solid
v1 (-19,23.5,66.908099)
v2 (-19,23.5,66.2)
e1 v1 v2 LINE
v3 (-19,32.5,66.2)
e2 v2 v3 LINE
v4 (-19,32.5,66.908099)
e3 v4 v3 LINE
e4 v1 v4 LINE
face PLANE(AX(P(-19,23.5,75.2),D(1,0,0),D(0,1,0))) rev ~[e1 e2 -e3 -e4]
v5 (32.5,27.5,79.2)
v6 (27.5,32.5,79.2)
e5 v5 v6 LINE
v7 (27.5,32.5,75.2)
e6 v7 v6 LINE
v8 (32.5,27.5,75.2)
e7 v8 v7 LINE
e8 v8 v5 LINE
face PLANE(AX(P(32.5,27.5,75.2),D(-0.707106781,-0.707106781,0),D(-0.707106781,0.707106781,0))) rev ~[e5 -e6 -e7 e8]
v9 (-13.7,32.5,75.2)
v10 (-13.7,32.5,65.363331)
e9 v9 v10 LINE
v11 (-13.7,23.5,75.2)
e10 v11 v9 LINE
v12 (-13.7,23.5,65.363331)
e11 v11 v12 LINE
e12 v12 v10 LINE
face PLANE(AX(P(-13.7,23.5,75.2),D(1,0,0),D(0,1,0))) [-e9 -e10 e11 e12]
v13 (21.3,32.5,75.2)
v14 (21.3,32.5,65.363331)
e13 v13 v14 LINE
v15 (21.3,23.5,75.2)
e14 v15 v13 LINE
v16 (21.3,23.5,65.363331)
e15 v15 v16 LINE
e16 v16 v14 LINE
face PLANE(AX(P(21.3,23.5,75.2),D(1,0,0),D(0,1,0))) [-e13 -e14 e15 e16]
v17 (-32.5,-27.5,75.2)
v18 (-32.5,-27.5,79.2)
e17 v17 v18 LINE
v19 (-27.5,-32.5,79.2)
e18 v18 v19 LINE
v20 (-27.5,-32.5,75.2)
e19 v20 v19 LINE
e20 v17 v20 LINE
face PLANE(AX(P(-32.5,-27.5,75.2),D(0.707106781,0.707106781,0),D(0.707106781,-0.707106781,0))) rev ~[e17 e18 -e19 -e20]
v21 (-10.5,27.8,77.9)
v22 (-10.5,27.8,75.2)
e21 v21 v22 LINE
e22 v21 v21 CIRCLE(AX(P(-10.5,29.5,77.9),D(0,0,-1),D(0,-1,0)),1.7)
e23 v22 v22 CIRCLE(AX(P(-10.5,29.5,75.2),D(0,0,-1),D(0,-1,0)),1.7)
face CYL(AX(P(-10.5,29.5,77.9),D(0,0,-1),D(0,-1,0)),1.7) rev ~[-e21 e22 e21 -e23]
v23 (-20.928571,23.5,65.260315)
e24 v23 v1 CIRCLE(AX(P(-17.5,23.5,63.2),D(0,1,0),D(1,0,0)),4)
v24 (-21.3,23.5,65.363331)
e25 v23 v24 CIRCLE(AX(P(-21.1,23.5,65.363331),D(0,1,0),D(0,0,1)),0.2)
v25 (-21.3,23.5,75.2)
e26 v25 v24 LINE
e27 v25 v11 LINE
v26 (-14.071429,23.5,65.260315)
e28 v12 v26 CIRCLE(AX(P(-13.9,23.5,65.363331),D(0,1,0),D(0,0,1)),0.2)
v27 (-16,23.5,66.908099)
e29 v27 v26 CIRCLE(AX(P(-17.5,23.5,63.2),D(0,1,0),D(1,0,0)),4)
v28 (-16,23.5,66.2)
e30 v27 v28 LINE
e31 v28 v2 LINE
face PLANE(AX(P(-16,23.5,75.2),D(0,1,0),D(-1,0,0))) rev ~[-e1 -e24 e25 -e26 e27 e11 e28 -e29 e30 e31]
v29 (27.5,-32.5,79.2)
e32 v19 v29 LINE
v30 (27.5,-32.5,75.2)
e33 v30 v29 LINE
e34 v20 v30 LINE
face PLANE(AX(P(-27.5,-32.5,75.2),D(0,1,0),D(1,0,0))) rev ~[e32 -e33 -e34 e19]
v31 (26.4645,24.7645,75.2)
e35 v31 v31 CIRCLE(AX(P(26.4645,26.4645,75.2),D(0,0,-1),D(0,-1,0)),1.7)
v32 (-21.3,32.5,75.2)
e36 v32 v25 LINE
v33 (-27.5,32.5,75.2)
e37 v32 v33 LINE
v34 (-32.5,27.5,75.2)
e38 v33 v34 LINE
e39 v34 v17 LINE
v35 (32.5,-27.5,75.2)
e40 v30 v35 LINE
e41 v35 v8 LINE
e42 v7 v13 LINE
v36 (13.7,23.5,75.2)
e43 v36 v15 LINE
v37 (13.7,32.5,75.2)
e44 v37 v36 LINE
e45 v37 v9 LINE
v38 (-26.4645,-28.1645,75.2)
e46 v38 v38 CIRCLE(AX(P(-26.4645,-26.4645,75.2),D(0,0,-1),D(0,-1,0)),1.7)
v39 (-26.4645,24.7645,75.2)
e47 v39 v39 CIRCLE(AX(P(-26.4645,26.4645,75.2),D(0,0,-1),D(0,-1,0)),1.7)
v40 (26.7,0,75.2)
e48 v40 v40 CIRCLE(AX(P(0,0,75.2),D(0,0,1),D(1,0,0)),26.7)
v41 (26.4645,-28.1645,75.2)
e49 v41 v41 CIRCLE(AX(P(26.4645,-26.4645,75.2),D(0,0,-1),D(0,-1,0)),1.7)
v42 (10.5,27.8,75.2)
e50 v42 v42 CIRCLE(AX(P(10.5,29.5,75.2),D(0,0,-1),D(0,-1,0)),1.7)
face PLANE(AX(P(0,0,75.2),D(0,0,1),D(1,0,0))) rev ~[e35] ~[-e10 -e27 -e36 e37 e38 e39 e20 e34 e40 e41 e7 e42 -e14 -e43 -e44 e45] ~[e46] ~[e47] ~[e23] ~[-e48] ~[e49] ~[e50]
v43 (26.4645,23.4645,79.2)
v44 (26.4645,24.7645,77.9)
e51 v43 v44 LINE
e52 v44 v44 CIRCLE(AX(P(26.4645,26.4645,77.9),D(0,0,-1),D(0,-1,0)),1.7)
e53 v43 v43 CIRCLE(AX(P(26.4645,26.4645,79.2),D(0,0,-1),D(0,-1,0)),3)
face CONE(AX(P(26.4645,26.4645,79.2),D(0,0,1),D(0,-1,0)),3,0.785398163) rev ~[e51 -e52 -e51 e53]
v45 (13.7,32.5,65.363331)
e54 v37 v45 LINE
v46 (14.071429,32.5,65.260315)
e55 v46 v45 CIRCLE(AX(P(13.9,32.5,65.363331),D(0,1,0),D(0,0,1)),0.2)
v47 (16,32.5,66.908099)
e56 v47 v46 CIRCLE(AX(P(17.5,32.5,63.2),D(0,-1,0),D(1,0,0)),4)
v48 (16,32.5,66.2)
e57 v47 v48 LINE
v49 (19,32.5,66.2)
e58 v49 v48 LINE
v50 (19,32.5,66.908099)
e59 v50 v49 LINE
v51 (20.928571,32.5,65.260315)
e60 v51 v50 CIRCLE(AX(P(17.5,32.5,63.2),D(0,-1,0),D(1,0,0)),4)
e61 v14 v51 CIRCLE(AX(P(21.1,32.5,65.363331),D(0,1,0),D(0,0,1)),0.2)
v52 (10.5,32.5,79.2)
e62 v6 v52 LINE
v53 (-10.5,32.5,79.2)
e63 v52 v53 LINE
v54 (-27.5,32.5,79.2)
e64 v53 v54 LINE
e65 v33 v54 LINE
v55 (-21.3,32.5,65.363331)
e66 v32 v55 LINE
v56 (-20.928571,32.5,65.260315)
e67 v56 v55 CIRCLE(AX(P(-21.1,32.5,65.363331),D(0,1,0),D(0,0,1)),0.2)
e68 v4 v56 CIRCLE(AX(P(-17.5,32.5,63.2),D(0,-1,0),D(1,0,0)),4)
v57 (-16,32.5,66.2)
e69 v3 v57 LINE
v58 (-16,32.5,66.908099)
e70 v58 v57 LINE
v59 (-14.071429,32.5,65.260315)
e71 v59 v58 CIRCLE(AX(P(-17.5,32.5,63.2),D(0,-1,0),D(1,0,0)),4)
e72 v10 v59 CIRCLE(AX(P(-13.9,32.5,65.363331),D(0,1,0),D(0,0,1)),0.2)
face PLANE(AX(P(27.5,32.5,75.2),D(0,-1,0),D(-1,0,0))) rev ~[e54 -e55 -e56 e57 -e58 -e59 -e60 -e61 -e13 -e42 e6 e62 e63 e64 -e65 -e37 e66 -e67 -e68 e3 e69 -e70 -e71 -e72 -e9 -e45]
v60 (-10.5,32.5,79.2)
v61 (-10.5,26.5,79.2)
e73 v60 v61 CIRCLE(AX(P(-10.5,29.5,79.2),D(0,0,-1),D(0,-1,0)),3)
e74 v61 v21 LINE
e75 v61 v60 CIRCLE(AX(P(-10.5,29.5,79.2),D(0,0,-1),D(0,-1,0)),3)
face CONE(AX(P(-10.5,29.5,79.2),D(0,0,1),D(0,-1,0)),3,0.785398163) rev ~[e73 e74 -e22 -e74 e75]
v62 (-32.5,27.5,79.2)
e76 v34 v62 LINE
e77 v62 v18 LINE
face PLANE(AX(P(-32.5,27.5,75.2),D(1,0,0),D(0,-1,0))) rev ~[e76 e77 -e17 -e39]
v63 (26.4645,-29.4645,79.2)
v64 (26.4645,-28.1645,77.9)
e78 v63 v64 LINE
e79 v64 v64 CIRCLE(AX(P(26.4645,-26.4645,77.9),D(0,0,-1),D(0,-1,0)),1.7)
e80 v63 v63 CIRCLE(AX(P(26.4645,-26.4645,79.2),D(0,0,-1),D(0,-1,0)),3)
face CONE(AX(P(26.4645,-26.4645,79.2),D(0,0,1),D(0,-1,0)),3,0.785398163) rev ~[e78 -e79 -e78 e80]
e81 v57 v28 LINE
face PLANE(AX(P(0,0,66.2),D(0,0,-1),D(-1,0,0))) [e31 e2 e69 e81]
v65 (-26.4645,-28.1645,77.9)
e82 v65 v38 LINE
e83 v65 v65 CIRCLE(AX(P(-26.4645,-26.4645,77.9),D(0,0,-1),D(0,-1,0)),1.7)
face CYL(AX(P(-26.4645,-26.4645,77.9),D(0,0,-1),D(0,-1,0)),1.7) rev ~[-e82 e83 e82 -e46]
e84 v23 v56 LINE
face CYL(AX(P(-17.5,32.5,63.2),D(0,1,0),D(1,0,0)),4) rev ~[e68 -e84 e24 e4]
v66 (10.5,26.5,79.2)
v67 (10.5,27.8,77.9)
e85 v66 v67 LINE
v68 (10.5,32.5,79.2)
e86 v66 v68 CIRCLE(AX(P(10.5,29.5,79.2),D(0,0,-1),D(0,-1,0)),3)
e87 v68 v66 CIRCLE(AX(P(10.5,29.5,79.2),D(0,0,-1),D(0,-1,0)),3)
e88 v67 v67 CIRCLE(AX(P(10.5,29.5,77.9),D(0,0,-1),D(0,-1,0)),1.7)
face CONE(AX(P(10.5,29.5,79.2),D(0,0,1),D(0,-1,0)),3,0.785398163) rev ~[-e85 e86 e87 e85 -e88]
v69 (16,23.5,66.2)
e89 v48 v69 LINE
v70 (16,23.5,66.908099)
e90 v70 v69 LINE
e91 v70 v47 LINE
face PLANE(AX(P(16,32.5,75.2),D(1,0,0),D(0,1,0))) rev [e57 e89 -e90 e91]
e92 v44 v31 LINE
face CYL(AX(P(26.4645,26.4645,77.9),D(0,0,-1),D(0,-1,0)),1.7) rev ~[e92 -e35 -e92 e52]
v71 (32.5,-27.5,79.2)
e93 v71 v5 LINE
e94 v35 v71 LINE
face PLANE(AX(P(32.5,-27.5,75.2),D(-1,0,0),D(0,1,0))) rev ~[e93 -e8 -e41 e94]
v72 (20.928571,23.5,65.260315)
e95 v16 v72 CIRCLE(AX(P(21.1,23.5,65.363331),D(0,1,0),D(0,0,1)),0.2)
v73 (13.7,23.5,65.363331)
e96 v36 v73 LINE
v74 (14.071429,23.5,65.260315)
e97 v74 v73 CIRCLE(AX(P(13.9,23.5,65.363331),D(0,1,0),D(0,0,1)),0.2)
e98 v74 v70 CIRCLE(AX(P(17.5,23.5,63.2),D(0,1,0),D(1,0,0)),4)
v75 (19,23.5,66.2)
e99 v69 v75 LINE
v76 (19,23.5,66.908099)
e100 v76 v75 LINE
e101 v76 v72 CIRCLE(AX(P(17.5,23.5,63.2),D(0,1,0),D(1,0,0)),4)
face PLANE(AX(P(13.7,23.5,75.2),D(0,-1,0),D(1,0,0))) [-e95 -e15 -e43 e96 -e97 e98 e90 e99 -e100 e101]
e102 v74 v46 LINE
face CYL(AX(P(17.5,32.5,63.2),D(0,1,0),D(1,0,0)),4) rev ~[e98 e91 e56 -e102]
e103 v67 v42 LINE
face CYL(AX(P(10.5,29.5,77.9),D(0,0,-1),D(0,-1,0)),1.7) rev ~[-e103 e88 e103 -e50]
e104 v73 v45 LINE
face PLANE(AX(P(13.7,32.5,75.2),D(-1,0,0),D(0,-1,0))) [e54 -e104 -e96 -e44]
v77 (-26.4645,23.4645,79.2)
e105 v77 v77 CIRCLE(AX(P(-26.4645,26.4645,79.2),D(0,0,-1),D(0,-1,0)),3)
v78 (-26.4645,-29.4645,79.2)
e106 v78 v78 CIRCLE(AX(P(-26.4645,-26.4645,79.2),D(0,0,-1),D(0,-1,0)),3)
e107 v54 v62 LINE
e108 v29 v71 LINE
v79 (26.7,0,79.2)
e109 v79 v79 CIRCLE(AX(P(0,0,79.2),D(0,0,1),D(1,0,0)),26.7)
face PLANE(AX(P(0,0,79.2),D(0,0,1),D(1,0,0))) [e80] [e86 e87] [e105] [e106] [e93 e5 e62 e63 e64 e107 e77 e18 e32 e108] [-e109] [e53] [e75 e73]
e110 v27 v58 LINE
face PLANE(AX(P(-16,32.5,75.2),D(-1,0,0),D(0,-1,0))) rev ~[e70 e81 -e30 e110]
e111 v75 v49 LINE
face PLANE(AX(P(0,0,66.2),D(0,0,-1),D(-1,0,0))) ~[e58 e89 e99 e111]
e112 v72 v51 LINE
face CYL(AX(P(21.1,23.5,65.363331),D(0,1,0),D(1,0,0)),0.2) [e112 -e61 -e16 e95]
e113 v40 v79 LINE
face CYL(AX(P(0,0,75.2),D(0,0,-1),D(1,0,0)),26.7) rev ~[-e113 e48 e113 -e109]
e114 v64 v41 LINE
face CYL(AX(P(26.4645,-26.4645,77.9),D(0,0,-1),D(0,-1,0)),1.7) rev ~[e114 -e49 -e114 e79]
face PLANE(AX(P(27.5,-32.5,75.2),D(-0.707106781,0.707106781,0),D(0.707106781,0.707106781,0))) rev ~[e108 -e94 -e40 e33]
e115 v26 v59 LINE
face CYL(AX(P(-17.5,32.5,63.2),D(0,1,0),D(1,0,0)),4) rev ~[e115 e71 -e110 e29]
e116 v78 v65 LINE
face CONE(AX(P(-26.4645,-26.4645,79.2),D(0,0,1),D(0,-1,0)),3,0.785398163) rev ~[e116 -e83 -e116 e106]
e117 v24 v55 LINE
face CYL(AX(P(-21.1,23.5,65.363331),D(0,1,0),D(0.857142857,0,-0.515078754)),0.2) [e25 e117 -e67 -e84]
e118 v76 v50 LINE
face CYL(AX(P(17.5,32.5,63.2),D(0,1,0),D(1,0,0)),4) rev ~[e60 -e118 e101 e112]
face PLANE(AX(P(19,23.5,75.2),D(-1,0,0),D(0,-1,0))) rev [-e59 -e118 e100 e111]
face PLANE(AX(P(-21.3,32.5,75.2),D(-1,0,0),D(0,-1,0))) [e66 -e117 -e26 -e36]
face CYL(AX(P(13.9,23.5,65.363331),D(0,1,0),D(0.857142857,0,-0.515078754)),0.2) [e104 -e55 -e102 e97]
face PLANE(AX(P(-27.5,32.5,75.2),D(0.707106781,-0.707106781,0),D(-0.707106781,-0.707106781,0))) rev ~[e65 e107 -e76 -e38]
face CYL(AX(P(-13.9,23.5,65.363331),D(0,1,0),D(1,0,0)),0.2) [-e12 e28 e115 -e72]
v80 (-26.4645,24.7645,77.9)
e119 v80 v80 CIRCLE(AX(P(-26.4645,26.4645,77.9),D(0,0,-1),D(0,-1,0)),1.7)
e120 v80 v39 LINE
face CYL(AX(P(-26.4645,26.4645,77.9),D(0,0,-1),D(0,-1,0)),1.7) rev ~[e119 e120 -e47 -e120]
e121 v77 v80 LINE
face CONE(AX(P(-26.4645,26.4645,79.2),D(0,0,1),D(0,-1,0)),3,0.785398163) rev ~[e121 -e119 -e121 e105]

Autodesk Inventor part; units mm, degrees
ref_plane "YZ Plane" through (0, 0, 0) normal (1, 0, 0) x (0, 1, 0)
ref_plane "XZ Plane" through (0, 0, 0) normal (0, 1, 0) x (-1, 0, 0)
ref_plane "РабПлоскость1" through (0, 0, 75.2) normal (0, 0, 1) x (1, 0, 0)
sketch "Эскиз1" plane through (0, 0, 75.2) normal (0, 0, 1) x (1, 0, 0)
  circle A0 centre (26.4645, -26.4645) radius 1.95 construction
  circle A1 centre (-26.4645, 26.4645) radius 1.95 construction
  circle A2 centre (26.4645, 26.4645) radius 1.95 construction
  circle A3 centre (-26.4645, -26.4645) radius 1.95 construction
  circle A4 centre (15.35, -15.35) radius 1.7 construction
  circle A5 centre (-15.35, 15.35) radius 1.7 construction
  circle A6 centre (15.35, 15.35) radius 1.7 construction
  circle A7 centre (-15.35, -15.35) radius 1.7 construction
  line L0 (-32.5, 27.5) -> (-32.5, -27.5) projected
  line L1 (-27.5, 32.5) -> (-32.5, 27.5) projected
  line L2 (27.5, 32.5) -> (-27.5, 32.5) projected
  line L3 (32.5, 27.5) -> (27.5, 32.5) projected
  line L4 (32.5, -27.5) -> (32.5, 27.5) projected
  line L5 (27.5, -32.5) -> (32.5, -27.5) projected
  line L6 (-27.5, -32.5) -> (27.5, -32.5) projected
  line L7 (-32.5, -27.5) -> (-27.5, -32.5) projected
  circle A8 centre (0, 0) radius 11.5 construction
  circle A9 centre (0, 0) radius 26.7 projected
  point P0 (0, 0)
extrude "Выдавливание1" add sketch "Эскиз1" along normal blind 4
sketch "Эскиз2" plane through (0, 0, 79.2) normal (0, 0, 1) x (1, 0, 0)
  circle A0 centre (26.4645, 26.4645) radius 2.25 projected
  circle A1 centre (26.4645, -26.4645) radius 2.25 projected
  circle A2 centre (-26.4645, -26.4645) radius 2.25 projected
  circle A3 centre (-26.4645, 26.4645) radius 1.95 projected
  circle A4 centre (10.5, 29.5) radius 2.25 construction
  circle A5 centre (-10.5, 29.5) radius 1.65 construction
hole "Отверстие1" at (26.4645, 26.4645, 79.2) at (-26.4645, 26.4645, 79.2) at (26.4645, -26.4645, 79.2) at (-26.4645, -26.4645, 79.2) at (10.5, 29.5, 79.2) at (-10.5, 29.5, 79.2) direction (0, 0, -1) diameter 3.4 end through all countersink diameter 6 countersink angle 90 clearance for "с потайной головкой ГОСТ 12876-67" size "M3" standard "ГОСТ"
sketch "Эскиз3" plane through (0, 0, 75.2) normal (0, 0, -1) x (-1, 0, 0)
  line L0 (-21.5, 32.5) -> (-13.5, 32.5) construction
  line L1 (-13.5, 32.5) -> (-13.5, 22.5) construction
  line L2 (-13.5, 22.5) -> (-21.5, 22.5) construction
  line L3 (-21.5, 22.5) -> (-21.5, 32.5) construction
  line L4 (13.5, 32.5) -> (21.5, 32.5) construction
  line L5 (21.5, 32.5) -> (21.5, 22.5) construction
  line L6 (21.5, 22.5) -> (13.5, 22.5) construction
  line L7 (13.5, 22.5) -> (13.5, 32.5) construction
  line L8 (0, 0) -> (0, 42.6658) construction
  line L9 (-27.5, 32.5) -> (27.5, 32.5) construction
  line L10 (-21.3, 32.5) -> (-13.7, 32.5)
  line L11 (-13.7, 32.5) -> (-13.7, 23.5)
  line L12 (-13.7, 23.5) -> (-21.3, 23.5)
  line L13 (-21.3, 23.5) -> (-21.3, 32.5)
  line L14 (13.7, 32.5) -> (21.3, 32.5)
  line L15 (21.3, 32.5) -> (21.3, 23.5)
  line L16 (21.3, 23.5) -> (13.7, 23.5)
  line L17 (13.7, 23.5) -> (13.7, 32.5)
  dimension "d9" = 10
  dimension "d10" = 0.2
  dimension "d11" = 0.2
  dimension "d12" = 9
extrude "Выдавливание2" add sketch "Эскиз3" along normal blind 12
sketch "Эскиз4" plane through (-27.5, 32.5, 79.2) normal (0, 1, 0) x (1, 0, 0)
  arc A0 (14, 16) -> (6, 16) centre (10, 16) ccw
  arc A1 (49, 16) -> (41, 16) centre (45, 16) ccw
  circle A2 centre (45, 16) radius 4
  circle A3 centre (10, 16) radius 4
  point P0 (27.5, 79.2)
extrude "Выдавливание3" cut sketch "Эскиз4" against normal through all
fillet "Сопряжение1" radius 0.2 4 edges at (-21.3, 28, 64.449) (-13.7, 28, 64.449) (13.7, 28, 64.449) (21.3, 28, 64.449)
sketch "Эскиз5" plane through (0, 0, 75.2) normal (0, 0, -1) x (-1, 0, 0)
  line L0 (14.0714, 23.5) -> (14.0714, 32.5) construction
  line L1 (20.9286, 23.5) -> (14.0714, 23.5) construction
  line L2 (20.9286, 32.5) -> (20.9286, 23.5) construction
  line L3 (14.0714, 32.5) -> (20.9286, 32.5) construction
  line L4 (-20.9286, 23.5) -> (-20.9286, 32.5) construction
  line L5 (-14.0714, 23.5) -> (-20.9286, 23.5) construction
  line L6 (-14.0714, 32.5) -> (-14.0714, 23.5) construction
  line L7 (-20.9286, 32.5) -> (-14.0714, 32.5) construction
  line L8 (20.9286, 23.5) -> (14.0714, 32.5) construction
  line L9 (19, 32.5) -> (16, 32.5)
  line L10 (16, 32.5) -> (16, 23.5)
  line L11 (16, 23.5) -> (19, 23.5)
  line L12 (19, 23.5) -> (19, 32.5)
  line L13 (19, 32.5) -> (16, 23.5) construction
  line L14 (16, 32.5) -> (19, 23.5) construction
  point P0 (0, 0)
  point P1 (17.5, 28)
  dimension "d18" = 3
extrude "Выдавливание4" add sketch "Эскиз5" along normal blind 9
mirror "Зеркальное отражение1" about plane through (0, 0, 0) normal (1, 0, 0) of "Выдавливание4"
equation "\"d11\" = d10"
properties part number "Крышка" material "По умолчанию1"
